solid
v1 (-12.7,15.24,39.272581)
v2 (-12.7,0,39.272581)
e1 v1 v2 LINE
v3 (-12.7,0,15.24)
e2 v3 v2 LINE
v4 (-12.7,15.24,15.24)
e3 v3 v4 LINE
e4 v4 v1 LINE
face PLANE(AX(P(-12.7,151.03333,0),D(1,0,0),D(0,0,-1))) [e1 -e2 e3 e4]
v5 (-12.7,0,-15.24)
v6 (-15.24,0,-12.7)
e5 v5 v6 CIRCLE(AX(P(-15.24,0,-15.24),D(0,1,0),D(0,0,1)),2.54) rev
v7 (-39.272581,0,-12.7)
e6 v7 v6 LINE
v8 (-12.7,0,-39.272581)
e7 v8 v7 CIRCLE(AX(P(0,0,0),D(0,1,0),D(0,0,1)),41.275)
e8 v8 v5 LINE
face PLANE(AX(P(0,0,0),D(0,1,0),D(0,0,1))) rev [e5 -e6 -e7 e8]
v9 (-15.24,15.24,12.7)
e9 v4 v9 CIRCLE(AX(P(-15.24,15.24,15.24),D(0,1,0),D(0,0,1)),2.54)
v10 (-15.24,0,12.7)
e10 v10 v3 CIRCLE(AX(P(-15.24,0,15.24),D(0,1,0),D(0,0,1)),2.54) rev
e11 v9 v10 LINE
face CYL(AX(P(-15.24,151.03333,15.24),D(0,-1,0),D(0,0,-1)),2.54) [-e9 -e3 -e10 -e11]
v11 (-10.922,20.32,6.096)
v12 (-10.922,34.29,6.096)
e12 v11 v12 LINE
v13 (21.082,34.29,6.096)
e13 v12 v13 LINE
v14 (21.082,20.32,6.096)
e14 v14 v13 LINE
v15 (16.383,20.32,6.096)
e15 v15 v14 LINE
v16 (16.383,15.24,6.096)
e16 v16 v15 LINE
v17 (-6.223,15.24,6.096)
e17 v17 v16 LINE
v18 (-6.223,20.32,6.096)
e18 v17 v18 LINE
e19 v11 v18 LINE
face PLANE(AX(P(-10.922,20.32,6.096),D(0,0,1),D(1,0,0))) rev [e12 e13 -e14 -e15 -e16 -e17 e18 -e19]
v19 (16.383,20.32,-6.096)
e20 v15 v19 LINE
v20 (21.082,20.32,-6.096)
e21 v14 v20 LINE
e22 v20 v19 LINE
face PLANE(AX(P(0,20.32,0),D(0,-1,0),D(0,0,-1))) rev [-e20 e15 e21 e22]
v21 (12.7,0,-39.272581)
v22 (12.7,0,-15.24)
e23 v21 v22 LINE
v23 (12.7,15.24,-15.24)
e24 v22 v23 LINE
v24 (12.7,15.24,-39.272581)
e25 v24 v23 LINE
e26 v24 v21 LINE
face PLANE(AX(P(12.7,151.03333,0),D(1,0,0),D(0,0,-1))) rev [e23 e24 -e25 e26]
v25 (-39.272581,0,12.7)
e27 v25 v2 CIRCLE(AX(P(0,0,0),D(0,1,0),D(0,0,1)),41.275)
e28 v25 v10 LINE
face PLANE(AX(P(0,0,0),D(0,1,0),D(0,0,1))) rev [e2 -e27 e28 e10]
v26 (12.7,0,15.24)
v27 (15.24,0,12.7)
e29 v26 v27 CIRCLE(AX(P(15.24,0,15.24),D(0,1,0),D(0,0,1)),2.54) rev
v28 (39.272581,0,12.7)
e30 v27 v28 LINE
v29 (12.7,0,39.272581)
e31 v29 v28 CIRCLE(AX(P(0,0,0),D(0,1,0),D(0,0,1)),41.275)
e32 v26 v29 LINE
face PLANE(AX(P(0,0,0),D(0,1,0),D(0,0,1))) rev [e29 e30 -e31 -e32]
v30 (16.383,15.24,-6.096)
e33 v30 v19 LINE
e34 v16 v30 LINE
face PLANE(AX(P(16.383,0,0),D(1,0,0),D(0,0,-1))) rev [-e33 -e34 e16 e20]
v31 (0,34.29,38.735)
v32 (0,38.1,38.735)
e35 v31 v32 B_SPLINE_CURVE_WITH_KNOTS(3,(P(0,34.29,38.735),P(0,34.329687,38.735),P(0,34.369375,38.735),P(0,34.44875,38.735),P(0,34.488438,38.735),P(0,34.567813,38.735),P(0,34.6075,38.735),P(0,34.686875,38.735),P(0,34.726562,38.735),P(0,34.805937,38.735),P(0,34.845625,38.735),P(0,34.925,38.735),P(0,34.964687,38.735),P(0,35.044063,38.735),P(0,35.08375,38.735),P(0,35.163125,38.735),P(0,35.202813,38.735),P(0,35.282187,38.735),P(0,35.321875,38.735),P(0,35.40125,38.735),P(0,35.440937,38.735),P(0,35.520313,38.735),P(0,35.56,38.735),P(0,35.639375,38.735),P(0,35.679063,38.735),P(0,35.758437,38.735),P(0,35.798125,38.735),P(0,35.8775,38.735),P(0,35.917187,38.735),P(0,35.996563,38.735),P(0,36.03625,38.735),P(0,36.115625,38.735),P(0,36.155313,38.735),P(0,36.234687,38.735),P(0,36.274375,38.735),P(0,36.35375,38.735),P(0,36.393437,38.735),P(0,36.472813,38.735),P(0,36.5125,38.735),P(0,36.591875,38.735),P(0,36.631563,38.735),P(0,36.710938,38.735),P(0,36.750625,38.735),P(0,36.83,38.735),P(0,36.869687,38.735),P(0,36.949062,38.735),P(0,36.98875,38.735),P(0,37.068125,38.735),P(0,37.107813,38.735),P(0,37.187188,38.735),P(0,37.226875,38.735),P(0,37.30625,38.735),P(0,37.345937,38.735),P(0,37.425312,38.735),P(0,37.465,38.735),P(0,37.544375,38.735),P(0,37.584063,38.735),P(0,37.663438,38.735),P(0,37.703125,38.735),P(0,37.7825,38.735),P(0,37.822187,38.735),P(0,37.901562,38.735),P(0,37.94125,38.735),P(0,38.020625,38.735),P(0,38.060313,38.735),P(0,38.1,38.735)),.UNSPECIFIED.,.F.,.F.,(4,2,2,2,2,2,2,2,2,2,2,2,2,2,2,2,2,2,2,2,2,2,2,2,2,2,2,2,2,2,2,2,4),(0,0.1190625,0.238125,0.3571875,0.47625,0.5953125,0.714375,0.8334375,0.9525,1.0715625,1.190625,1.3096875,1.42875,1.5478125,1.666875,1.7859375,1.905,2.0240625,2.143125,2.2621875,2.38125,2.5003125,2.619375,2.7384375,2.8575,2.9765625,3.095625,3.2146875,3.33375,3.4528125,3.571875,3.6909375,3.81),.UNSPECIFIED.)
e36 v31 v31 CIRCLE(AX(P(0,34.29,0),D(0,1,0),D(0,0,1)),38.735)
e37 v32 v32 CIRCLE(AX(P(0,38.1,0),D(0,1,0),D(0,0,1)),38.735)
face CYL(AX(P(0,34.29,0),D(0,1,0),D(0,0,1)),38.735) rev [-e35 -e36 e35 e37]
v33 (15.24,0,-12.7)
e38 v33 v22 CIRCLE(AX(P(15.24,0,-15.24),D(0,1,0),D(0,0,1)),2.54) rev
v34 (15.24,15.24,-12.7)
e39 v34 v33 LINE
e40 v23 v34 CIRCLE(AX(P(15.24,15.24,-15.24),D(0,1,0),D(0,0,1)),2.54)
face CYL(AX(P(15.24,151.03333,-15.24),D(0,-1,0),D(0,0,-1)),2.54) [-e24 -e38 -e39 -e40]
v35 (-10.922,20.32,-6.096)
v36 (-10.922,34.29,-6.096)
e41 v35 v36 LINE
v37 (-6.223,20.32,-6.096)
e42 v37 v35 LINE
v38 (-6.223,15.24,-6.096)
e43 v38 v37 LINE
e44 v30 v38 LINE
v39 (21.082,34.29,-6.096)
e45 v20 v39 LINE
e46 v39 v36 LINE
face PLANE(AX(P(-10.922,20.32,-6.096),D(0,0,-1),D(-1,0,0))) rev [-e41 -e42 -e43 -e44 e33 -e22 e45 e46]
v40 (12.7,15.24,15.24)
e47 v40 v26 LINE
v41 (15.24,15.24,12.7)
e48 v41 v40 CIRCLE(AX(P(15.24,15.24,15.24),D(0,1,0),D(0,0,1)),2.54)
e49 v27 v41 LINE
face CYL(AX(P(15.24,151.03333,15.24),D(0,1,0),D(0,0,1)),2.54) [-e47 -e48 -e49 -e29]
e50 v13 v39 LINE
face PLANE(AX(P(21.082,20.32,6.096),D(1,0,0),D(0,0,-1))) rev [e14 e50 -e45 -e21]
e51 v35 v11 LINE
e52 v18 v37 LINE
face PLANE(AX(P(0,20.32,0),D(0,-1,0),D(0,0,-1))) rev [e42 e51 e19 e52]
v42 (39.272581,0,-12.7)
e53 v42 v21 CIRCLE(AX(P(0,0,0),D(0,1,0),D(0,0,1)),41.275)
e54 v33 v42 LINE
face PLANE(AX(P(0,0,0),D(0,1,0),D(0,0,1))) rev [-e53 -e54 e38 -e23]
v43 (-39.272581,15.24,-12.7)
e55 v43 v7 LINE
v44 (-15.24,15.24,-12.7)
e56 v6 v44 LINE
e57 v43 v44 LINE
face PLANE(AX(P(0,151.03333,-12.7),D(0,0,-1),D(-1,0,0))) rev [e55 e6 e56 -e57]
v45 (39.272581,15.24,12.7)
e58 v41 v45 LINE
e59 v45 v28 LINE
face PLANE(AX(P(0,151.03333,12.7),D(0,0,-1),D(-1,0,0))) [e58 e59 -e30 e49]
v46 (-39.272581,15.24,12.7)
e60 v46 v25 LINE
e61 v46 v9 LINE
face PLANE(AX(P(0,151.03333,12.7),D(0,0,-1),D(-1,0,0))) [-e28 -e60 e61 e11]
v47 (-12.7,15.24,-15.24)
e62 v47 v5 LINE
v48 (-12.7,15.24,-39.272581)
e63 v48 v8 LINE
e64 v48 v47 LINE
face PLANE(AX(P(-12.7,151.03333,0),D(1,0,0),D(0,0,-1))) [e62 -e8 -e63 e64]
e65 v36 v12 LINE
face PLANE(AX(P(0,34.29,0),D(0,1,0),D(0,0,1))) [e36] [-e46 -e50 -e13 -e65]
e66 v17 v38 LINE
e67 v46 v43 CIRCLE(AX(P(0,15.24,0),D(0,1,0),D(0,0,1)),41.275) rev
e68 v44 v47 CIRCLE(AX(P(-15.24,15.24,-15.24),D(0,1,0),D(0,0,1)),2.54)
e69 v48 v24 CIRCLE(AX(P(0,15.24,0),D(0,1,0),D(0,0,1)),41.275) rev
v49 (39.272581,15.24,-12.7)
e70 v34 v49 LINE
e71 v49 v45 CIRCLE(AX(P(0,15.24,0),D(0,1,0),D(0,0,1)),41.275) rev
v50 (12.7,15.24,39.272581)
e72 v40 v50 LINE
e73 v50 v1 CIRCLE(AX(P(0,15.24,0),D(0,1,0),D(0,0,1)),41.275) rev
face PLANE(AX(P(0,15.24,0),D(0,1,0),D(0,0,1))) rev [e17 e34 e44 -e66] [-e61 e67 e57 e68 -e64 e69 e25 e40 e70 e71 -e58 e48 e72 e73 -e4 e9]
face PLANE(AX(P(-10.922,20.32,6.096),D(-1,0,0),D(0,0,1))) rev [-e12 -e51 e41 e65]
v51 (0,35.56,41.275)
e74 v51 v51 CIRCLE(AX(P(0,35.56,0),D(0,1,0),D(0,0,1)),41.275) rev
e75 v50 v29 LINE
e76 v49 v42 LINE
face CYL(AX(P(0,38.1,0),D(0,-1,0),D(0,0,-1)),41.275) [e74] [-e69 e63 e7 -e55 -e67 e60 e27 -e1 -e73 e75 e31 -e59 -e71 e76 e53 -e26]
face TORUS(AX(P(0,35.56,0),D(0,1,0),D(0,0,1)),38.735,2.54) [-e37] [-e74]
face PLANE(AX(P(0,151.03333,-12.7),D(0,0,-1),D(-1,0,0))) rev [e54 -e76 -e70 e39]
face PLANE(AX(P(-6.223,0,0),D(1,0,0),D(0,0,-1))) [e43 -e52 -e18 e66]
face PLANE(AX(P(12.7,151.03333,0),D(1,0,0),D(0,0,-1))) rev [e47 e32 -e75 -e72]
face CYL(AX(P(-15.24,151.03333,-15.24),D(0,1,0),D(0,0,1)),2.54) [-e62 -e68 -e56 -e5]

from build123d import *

# Parameters (mm, degrees)
SKETCH2_R           = 41.275
BOSS_EXTRUDE2_DEPTH = 38.1
SKETCH3_R           = 38.735
CUT_EXTRUDE1_DEPTH  = 3.81
SKETCH4_W           = 25.4
SKETCH4_H           = 25.4
CUT_EXTRUDE2_DEPTH  = 15.24
SKETCH5_W           = 32.004
SKETCH5_H           = 12.192
CUT_EXTRUDE3_DEPTH  = 13.97
SKETCH6_W           = 22.606
SKETCH6_H           = 12.192
CUT_EXTRUDE4_DEPTH  = 62.807391548
FILLET1_R           = 2.54


with BuildPart() as part:
    # Sketch2 → Boss-Extrude2 (new body)
    with BuildSketch(Plane(origin=(0, 0, 0), x_dir=(1, 0, 0), z_dir=(0, 1, 0))):
        with Locations(Location((0, 0, 0), (0, 0, 90))):
            Circle(SKETCH2_R)
    extrude(amount=BOSS_EXTRUDE2_DEPTH)

    # Sketch3 → Cut-Extrude1 (cut)
    with BuildSketch(Plane(origin=(0, 38.1, 0), x_dir=(1, 0, 0), z_dir=(0, 1, 0))):
        with Locations(Location((0, 0, 0), (0, 0, 270))):
            Circle(SKETCH3_R)
    extrude(amount=-CUT_EXTRUDE1_DEPTH, mode=Mode.SUBTRACT)

    # Sketch4 → Cut-Extrude2 (cut)
    with BuildSketch(Plane.XZ):
        with BuildLine():
            ThreePointArc((-12.7, -39.272581084), (-6.428446216, -40.771322081), (-6e-08, -41.275))
            ThreePointArc((-6e-08, -41.275), (6.428446158, -40.77132209), (12.7, -39.272581084))
            Line((12.7, -39.272581084), (12.7, -12.7))
            Line((12.7, -12.7), (-12.7, -12.7))
            Line((-12.7, -12.7), (-12.7, -39.272581084))
        make_face()
        Rectangle(SKETCH4_W, SKETCH4_H)
        with BuildLine():
            Line((-12.7, 39.272581084), (-12.7, 12.7))
            Line((-12.7, 12.7), (12.7, 12.7))
            Line((12.7, 12.7), (12.7, 39.272581084))
            ThreePointArc((12.7, 39.272581084), (6.428446095, 40.7713221), (-1.86e-07, 41.275))
            ThreePointArc((-1.86e-07, 41.275), (-6.428446279, 40.771322071), (-12.7, 39.272581084))
        make_face()
        with BuildLine():
            Line((12.7, 12.7), (12.7, -12.7))
            Line((12.7, -12.7), (39.272581084, -12.7))
            ThreePointArc((39.272581084, -12.7), (40.771322086, -6.428446187), (41.275, 0))
            ThreePointArc((41.275, 0), (40.771322086, 6.428446187), (39.272581084, 12.7))
            Line((39.272581084, 12.7), (12.7, 12.7))
        make_face()
        with BuildLine():
            Line((-39.272581084, -12.7), (-12.7, -12.7))
            Line((-12.7, -12.7), (-12.7, 12.7))
            Line((-12.7, 12.7), (-39.272581084, 12.7))
            ThreePointArc((-39.272581084, 12.7), (-40.77132209, 6.428446159), (-41.275, -5.7e-08))
            ThreePointArc((-41.275, -5.7e-08), (-40.771322081, -6.428446215), (-39.272581084, -12.7))
        make_face()
    extrude(amount=-CUT_EXTRUDE2_DEPTH, mode=Mode.SUBTRACT)

    # Sketch5 → Cut-Extrude3 (cut)
    with BuildSketch(Plane(origin=(0, 34.29, 0), x_dir=(1, 0, 0), z_dir=(0, 1, 0))):
        with Locations((5.08, 0)):
            Rectangle(SKETCH5_W, SKETCH5_H)
    extrude(amount=-CUT_EXTRUDE3_DEPTH, mode=Mode.SUBTRACT)

    # Sketch6 → Cut-Extrude4 (cut, through all)
    with BuildSketch(Plane(origin=(0, 20.32, 0), x_dir=(1, 0, 0), z_dir=(0, 1, 0))):
        with Locations((5.08, 0)):
            Rectangle(SKETCH6_W, SKETCH6_H)
    extrude(amount=-CUT_EXTRUDE4_DEPTH, mode=Mode.SUBTRACT)

    # Fillet1
    fillet1_edges = [part.edges().sort_by_distance(p)[0] for p in [
        (12.7, 7.62, 12.7),
        (-12.7, 7.62, 12.7),
        (-12.7, 7.62, -12.7),
        (12.7, 7.62, -12.7),
        (0, 38.1, 41.275),
    ]]
    fillet(fillet1_edges, radius=FILLET1_R - 0.0001)  # a hair under: the kernel refuses the full size


solid = part.part
